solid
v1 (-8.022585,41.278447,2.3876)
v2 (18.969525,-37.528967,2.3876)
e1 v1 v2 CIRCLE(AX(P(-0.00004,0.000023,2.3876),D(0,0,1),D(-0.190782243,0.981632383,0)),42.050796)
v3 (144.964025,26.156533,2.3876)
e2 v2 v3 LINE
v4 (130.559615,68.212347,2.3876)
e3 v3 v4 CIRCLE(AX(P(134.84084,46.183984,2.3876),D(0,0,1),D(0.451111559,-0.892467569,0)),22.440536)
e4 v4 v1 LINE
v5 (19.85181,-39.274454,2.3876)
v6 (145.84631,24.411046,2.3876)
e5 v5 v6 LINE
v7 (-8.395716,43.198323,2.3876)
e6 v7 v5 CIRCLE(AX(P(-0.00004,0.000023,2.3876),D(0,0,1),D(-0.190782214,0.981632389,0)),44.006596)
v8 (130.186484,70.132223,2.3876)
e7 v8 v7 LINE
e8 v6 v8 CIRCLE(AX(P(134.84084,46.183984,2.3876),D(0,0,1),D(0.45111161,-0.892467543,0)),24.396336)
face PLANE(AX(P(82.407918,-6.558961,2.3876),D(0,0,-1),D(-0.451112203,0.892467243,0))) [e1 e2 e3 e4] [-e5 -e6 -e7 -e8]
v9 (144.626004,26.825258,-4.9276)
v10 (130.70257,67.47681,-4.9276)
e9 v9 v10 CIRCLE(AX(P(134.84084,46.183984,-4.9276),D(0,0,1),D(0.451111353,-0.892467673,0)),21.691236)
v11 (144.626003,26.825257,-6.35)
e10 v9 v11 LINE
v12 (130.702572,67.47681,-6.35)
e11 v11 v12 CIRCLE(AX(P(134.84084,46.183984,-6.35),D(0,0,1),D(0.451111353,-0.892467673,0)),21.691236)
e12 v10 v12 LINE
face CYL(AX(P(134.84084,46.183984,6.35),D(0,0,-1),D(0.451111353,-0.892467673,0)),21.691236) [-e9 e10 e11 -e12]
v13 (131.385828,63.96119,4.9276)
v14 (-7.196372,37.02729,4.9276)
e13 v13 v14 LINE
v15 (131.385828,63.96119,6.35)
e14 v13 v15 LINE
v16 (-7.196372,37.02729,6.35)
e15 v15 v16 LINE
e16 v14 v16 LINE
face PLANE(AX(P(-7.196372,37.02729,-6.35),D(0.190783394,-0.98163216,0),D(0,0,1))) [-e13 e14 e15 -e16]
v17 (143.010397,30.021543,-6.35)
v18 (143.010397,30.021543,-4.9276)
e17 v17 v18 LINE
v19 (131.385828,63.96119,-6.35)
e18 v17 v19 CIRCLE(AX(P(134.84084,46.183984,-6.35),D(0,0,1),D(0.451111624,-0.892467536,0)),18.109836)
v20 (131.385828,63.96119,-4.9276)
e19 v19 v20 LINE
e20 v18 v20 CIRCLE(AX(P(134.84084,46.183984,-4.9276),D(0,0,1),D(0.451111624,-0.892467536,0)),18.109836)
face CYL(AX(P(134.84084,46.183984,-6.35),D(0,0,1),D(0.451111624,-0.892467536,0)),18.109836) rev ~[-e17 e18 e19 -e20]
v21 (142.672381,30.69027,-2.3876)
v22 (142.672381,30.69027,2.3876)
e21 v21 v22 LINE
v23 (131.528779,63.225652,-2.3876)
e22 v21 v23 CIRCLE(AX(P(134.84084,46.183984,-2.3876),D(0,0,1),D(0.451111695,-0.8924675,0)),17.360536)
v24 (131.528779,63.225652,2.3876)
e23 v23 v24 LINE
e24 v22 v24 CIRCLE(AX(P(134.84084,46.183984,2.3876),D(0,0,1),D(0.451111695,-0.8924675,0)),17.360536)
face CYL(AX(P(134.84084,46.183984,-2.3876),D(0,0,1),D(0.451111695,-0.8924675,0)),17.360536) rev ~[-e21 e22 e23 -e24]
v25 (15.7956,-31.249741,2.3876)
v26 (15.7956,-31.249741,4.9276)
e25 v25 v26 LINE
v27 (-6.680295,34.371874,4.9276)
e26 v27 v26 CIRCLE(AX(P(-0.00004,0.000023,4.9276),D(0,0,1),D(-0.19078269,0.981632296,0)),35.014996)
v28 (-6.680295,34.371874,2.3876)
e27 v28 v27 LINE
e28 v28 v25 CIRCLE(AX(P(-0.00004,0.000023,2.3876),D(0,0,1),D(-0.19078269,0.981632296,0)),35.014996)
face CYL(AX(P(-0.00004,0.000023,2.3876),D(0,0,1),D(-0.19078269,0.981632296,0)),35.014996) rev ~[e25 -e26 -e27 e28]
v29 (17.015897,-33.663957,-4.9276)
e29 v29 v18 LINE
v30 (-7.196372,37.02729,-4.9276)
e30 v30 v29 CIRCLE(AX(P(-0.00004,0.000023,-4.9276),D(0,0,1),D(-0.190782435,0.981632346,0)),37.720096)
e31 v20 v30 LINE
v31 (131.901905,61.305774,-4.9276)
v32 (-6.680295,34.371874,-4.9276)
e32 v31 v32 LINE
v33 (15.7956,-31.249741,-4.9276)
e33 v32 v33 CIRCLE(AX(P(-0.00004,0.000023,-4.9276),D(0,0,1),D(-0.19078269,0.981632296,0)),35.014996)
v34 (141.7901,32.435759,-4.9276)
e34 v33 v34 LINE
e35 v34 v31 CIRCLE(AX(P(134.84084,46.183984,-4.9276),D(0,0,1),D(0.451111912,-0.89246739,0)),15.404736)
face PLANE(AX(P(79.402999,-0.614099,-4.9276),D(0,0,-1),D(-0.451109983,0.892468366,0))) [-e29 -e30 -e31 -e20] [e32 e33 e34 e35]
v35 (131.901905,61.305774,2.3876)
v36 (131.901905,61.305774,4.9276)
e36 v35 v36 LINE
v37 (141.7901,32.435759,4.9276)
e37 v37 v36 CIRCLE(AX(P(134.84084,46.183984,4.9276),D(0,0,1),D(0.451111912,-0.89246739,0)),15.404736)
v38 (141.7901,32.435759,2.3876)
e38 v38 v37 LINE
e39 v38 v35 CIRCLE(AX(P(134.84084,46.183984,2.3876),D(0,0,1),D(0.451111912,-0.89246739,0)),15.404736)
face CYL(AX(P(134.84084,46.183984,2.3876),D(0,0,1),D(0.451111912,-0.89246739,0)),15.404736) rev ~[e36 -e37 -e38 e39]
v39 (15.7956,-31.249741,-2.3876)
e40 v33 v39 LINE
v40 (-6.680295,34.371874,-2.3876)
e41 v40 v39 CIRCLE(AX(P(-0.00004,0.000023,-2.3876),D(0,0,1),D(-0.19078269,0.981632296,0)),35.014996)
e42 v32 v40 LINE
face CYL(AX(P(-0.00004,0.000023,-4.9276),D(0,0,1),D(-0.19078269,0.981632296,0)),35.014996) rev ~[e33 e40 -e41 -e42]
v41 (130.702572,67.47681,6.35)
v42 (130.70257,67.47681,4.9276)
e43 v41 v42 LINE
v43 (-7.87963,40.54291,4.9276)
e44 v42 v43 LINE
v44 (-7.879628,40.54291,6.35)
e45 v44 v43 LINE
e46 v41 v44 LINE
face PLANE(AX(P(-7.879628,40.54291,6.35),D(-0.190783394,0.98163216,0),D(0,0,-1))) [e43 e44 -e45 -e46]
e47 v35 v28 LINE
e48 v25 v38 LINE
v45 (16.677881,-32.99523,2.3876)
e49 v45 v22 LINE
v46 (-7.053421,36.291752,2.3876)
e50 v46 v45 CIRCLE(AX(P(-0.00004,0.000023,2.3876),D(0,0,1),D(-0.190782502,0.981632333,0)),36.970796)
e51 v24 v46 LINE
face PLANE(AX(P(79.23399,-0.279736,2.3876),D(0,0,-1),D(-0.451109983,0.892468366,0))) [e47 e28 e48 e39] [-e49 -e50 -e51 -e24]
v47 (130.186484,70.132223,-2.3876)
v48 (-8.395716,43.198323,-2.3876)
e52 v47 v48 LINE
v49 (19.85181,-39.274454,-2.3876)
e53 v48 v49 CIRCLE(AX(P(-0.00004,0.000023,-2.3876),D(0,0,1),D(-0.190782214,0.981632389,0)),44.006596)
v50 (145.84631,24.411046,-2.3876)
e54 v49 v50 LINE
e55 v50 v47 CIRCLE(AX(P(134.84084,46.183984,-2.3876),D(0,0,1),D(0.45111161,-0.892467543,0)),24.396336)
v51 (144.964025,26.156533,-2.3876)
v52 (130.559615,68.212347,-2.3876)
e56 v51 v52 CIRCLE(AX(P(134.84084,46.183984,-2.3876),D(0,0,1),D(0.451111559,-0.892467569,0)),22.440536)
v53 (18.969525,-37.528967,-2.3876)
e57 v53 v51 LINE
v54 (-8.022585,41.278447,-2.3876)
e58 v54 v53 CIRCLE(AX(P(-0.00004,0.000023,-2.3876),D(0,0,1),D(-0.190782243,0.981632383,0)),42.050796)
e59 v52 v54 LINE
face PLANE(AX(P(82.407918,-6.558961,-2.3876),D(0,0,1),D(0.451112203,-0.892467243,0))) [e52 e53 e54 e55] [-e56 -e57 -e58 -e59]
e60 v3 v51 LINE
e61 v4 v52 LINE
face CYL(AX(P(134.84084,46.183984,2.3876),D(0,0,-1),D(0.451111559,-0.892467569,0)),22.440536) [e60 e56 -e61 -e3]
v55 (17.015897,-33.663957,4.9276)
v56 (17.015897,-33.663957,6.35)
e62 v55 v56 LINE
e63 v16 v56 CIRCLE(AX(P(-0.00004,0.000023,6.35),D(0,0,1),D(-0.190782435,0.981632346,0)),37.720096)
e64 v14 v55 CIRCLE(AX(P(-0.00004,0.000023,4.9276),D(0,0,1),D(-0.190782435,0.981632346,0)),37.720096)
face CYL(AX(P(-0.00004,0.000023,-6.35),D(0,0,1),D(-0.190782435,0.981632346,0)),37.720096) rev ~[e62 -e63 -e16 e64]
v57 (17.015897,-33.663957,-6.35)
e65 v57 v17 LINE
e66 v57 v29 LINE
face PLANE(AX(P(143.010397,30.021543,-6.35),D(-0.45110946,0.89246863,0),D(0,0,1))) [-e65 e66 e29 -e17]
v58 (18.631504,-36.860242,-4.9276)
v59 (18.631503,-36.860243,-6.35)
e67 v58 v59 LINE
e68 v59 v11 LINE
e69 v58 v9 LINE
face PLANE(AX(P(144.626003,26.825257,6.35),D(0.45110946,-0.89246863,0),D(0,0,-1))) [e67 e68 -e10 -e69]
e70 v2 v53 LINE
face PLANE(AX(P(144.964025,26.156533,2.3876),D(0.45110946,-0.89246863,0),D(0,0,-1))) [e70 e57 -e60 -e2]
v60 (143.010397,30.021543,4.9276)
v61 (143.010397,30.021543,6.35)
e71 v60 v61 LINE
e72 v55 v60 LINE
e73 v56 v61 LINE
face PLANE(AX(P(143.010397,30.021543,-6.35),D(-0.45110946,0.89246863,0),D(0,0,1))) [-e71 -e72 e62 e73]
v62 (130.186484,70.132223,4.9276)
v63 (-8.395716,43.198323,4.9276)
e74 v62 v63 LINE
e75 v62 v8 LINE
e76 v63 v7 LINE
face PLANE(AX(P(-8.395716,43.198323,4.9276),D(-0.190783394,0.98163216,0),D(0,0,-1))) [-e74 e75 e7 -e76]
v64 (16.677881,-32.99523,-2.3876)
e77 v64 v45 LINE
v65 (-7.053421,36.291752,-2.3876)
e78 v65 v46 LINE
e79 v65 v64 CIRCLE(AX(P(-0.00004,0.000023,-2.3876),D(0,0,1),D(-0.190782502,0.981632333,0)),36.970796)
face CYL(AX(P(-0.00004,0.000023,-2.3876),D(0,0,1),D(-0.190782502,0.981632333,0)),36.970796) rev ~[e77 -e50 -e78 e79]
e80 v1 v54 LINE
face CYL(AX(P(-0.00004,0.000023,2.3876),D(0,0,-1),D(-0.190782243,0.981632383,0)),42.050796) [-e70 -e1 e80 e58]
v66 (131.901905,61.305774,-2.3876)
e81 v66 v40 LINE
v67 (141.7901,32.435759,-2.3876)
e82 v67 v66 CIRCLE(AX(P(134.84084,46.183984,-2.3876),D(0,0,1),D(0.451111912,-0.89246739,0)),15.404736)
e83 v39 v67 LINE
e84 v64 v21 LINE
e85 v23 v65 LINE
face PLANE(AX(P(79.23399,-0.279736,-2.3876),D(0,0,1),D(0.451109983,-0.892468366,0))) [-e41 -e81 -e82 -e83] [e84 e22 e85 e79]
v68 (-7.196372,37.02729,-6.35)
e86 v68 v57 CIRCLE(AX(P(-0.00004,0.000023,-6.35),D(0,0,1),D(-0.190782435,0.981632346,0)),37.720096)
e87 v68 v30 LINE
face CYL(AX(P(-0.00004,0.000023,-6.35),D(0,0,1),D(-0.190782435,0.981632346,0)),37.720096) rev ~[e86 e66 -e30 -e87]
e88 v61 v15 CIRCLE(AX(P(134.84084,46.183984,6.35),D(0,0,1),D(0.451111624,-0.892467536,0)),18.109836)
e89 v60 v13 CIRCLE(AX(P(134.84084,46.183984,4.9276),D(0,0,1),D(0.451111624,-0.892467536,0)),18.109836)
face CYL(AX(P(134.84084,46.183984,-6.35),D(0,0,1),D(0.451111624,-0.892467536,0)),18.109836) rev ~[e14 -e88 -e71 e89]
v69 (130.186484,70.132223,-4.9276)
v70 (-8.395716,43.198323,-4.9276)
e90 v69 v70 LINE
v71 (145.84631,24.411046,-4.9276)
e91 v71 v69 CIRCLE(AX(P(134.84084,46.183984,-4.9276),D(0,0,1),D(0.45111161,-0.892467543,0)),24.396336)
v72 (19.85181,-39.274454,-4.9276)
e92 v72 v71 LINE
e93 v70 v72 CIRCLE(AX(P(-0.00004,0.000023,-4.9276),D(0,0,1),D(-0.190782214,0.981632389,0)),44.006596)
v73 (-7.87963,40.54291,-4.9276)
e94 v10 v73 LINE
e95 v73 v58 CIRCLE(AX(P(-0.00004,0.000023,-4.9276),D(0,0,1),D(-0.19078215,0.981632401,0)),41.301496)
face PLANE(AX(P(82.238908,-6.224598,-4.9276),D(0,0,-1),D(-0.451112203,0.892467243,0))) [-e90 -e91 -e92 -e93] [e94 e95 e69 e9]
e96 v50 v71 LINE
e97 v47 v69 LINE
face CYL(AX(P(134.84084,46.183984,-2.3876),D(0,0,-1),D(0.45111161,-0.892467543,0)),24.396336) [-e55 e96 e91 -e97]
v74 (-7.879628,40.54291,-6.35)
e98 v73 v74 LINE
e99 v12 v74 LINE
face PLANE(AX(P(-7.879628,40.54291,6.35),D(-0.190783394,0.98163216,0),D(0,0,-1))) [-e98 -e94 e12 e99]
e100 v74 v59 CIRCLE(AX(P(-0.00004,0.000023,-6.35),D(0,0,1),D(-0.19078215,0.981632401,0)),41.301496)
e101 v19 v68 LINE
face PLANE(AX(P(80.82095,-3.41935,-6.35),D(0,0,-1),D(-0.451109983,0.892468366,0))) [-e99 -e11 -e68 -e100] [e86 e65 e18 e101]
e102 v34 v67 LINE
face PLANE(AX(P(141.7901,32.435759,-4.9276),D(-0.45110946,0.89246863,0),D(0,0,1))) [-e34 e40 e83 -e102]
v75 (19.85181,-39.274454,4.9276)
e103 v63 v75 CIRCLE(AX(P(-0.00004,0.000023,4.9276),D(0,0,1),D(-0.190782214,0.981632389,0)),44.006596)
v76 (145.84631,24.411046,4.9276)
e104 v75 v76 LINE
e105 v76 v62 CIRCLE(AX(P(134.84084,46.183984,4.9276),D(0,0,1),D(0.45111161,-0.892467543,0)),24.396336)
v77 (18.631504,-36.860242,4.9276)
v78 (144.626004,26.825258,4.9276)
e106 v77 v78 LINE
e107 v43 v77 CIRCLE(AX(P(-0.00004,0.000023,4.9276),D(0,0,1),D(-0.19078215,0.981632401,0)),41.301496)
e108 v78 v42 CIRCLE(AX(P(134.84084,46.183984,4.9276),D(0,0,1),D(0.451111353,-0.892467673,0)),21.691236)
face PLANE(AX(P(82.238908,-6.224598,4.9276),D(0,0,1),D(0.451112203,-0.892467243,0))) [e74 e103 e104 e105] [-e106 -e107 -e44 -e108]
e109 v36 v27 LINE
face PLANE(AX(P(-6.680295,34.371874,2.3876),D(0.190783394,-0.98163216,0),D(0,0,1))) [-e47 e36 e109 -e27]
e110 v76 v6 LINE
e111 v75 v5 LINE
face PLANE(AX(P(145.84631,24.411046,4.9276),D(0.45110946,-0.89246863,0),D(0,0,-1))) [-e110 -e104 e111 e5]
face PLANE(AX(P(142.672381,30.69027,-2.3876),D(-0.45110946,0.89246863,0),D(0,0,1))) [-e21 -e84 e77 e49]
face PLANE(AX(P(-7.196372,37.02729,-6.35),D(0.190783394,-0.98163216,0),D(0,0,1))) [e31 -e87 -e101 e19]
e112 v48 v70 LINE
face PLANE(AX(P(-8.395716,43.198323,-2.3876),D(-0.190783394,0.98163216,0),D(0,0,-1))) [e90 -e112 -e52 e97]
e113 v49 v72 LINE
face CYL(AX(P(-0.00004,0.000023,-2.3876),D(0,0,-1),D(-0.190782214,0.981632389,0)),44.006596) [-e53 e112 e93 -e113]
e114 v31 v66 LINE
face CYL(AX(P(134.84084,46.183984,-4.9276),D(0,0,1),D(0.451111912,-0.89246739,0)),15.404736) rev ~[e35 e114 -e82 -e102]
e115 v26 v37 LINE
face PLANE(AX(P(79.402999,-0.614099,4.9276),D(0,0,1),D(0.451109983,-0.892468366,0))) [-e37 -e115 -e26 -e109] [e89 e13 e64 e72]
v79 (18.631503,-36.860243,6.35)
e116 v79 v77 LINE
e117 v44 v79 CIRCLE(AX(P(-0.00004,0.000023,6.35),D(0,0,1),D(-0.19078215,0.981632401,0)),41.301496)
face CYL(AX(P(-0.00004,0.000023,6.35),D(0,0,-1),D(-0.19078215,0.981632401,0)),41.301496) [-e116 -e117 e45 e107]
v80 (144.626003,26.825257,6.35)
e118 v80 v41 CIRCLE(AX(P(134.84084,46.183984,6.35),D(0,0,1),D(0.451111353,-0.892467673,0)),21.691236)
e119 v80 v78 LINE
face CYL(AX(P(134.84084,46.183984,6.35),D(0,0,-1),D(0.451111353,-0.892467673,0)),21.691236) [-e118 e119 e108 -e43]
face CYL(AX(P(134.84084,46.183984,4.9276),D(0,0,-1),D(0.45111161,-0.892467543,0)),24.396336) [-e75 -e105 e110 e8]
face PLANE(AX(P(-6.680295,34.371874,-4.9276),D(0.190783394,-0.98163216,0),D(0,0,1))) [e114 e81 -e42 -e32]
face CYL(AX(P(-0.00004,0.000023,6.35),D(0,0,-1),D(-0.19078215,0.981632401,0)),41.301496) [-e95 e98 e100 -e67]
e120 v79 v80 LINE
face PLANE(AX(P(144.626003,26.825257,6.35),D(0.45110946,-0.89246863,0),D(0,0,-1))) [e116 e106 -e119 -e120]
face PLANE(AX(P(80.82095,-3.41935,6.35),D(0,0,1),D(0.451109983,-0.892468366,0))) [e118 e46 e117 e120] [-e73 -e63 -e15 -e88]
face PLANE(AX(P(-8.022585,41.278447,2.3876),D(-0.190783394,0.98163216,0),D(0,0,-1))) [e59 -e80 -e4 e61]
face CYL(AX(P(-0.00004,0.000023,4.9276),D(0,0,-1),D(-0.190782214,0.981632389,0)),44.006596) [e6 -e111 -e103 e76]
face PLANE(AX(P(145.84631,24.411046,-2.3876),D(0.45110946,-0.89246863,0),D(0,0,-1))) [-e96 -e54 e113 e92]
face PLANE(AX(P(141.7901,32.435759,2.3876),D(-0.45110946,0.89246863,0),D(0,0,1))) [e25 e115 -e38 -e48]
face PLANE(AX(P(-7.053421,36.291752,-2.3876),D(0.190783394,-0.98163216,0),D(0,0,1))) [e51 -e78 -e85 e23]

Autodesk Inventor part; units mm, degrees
ref_plane "Work Plane2" through (0, 0, 0) normal (-1, 0, 0) x (0, 0, 1)
ref_plane "Work Plane3" through (134.8408, 46.184, 0) normal (-0.9615757, 0.2745399, 0) x (0, 0, 1)
sketch "Path" plane through (0, 0, 0) normal (0, 0, 1) x (1, 0, 0)
  arc A0 (-7.538, 38.7851) -> (17.8237, -35.2621) centre (0, 0) ccw
  arc A1 (143.8182, 28.4234) -> (131.0442, 65.719) centre (134.8408, 46.184) ccw
  line L0 (143.8182, 28.4234) -> (17.8237, -35.2621)
  line L1 (-7.538, 38.7851) -> (131.0442, 65.719)
  dimension "d31" = 8.9916
ref_plane "Section Plane" through (17.8237, -35.2621, 0) normal (0.8924684, 0.45111, 0) x (0, 0, 1)
sketch "Section Sketch" plane through (17.8237, -35.2621, 0) normal (0.8924684, 0.45111, 0) x (0, 0, 1)
  line L0 (-6.35, -1.7907) -> (6.35, -1.7907)
  line L1 (6.35, -1.7907) -> (6.35, 1.7907)
  line L2 (6.35, 1.7907) -> (-6.35, 1.7907)
  line L3 (-6.35, 1.7907) -> (-6.35, -1.7907)
  line L4 (-2.3876, -2.54) -> (2.3876, -2.54)
  line L5 (2.3876, -2.54) -> (2.3876, 2.54)
  line L6 (2.3876, 2.54) -> (-2.3876, 2.54)
  line L7 (-2.3876, 2.54) -> (-2.3876, -2.54)
  line L8 (-2.3876, 0) -> (2.3876, 0) construction
  line L9 (-4.9276, -4.4958) -> (-2.3876, -4.4958)
  line L10 (-2.3876, -4.4958) -> (-2.3876, 4.4958)
  line L11 (-2.3876, 4.4958) -> (-4.9276, 4.4958)
  line L12 (-4.9276, 4.4958) -> (-4.9276, -4.4958)
  line L13 (2.3876, -4.4958) -> (4.9276, -4.4958)
  line L14 (4.9276, -4.4958) -> (4.9276, 4.4958)
  line L15 (4.9276, 4.4958) -> (2.3876, 4.4958)
  line L16 (2.3876, 4.4958) -> (2.3876, -4.4958)
  line L17 (-6.35, 0) -> (6.35, 0) construction
  point P0 (0, 0)
  point P1 (0, 0)
  dimension "d21" = 3.5814
  dimension "d22" = 5.08
  dimension "d23" = 4.7752
  dimension "d24" = 2.54
  dimension "d31" = 8.9916
  dimension "d32" = 12.7
sweep "Solid" add profiles "Section Sketch" path "Path"
pattern_of_one "Strand Pattern"
equation "\"d21\" = da_d2"
equation "\"d22\" = da_d1"
equation "\"d23\" = da_b1"
equation "\"d24\" = da_t1 + da_t2"
equation "\"d30\" = da_pt"
equation "\"da_p\" = 9.525"
equation "\"da_b1\" = 4.7752"
equation "\"da_h2\" = 8.9916"
equation "\"da_h3\" = 7.7978"
equation "\"da_d1\" = 5.08"
equation "\"da_d2\" = 3.5814"
equation "\"da_pt\" = 10.1346"
equation "\"da_b\" = 12.7"
equation "\"da_t1\" = 1.27"
equation "\"da_t2\" = 1.27"
properties part number "Roller Chain"
